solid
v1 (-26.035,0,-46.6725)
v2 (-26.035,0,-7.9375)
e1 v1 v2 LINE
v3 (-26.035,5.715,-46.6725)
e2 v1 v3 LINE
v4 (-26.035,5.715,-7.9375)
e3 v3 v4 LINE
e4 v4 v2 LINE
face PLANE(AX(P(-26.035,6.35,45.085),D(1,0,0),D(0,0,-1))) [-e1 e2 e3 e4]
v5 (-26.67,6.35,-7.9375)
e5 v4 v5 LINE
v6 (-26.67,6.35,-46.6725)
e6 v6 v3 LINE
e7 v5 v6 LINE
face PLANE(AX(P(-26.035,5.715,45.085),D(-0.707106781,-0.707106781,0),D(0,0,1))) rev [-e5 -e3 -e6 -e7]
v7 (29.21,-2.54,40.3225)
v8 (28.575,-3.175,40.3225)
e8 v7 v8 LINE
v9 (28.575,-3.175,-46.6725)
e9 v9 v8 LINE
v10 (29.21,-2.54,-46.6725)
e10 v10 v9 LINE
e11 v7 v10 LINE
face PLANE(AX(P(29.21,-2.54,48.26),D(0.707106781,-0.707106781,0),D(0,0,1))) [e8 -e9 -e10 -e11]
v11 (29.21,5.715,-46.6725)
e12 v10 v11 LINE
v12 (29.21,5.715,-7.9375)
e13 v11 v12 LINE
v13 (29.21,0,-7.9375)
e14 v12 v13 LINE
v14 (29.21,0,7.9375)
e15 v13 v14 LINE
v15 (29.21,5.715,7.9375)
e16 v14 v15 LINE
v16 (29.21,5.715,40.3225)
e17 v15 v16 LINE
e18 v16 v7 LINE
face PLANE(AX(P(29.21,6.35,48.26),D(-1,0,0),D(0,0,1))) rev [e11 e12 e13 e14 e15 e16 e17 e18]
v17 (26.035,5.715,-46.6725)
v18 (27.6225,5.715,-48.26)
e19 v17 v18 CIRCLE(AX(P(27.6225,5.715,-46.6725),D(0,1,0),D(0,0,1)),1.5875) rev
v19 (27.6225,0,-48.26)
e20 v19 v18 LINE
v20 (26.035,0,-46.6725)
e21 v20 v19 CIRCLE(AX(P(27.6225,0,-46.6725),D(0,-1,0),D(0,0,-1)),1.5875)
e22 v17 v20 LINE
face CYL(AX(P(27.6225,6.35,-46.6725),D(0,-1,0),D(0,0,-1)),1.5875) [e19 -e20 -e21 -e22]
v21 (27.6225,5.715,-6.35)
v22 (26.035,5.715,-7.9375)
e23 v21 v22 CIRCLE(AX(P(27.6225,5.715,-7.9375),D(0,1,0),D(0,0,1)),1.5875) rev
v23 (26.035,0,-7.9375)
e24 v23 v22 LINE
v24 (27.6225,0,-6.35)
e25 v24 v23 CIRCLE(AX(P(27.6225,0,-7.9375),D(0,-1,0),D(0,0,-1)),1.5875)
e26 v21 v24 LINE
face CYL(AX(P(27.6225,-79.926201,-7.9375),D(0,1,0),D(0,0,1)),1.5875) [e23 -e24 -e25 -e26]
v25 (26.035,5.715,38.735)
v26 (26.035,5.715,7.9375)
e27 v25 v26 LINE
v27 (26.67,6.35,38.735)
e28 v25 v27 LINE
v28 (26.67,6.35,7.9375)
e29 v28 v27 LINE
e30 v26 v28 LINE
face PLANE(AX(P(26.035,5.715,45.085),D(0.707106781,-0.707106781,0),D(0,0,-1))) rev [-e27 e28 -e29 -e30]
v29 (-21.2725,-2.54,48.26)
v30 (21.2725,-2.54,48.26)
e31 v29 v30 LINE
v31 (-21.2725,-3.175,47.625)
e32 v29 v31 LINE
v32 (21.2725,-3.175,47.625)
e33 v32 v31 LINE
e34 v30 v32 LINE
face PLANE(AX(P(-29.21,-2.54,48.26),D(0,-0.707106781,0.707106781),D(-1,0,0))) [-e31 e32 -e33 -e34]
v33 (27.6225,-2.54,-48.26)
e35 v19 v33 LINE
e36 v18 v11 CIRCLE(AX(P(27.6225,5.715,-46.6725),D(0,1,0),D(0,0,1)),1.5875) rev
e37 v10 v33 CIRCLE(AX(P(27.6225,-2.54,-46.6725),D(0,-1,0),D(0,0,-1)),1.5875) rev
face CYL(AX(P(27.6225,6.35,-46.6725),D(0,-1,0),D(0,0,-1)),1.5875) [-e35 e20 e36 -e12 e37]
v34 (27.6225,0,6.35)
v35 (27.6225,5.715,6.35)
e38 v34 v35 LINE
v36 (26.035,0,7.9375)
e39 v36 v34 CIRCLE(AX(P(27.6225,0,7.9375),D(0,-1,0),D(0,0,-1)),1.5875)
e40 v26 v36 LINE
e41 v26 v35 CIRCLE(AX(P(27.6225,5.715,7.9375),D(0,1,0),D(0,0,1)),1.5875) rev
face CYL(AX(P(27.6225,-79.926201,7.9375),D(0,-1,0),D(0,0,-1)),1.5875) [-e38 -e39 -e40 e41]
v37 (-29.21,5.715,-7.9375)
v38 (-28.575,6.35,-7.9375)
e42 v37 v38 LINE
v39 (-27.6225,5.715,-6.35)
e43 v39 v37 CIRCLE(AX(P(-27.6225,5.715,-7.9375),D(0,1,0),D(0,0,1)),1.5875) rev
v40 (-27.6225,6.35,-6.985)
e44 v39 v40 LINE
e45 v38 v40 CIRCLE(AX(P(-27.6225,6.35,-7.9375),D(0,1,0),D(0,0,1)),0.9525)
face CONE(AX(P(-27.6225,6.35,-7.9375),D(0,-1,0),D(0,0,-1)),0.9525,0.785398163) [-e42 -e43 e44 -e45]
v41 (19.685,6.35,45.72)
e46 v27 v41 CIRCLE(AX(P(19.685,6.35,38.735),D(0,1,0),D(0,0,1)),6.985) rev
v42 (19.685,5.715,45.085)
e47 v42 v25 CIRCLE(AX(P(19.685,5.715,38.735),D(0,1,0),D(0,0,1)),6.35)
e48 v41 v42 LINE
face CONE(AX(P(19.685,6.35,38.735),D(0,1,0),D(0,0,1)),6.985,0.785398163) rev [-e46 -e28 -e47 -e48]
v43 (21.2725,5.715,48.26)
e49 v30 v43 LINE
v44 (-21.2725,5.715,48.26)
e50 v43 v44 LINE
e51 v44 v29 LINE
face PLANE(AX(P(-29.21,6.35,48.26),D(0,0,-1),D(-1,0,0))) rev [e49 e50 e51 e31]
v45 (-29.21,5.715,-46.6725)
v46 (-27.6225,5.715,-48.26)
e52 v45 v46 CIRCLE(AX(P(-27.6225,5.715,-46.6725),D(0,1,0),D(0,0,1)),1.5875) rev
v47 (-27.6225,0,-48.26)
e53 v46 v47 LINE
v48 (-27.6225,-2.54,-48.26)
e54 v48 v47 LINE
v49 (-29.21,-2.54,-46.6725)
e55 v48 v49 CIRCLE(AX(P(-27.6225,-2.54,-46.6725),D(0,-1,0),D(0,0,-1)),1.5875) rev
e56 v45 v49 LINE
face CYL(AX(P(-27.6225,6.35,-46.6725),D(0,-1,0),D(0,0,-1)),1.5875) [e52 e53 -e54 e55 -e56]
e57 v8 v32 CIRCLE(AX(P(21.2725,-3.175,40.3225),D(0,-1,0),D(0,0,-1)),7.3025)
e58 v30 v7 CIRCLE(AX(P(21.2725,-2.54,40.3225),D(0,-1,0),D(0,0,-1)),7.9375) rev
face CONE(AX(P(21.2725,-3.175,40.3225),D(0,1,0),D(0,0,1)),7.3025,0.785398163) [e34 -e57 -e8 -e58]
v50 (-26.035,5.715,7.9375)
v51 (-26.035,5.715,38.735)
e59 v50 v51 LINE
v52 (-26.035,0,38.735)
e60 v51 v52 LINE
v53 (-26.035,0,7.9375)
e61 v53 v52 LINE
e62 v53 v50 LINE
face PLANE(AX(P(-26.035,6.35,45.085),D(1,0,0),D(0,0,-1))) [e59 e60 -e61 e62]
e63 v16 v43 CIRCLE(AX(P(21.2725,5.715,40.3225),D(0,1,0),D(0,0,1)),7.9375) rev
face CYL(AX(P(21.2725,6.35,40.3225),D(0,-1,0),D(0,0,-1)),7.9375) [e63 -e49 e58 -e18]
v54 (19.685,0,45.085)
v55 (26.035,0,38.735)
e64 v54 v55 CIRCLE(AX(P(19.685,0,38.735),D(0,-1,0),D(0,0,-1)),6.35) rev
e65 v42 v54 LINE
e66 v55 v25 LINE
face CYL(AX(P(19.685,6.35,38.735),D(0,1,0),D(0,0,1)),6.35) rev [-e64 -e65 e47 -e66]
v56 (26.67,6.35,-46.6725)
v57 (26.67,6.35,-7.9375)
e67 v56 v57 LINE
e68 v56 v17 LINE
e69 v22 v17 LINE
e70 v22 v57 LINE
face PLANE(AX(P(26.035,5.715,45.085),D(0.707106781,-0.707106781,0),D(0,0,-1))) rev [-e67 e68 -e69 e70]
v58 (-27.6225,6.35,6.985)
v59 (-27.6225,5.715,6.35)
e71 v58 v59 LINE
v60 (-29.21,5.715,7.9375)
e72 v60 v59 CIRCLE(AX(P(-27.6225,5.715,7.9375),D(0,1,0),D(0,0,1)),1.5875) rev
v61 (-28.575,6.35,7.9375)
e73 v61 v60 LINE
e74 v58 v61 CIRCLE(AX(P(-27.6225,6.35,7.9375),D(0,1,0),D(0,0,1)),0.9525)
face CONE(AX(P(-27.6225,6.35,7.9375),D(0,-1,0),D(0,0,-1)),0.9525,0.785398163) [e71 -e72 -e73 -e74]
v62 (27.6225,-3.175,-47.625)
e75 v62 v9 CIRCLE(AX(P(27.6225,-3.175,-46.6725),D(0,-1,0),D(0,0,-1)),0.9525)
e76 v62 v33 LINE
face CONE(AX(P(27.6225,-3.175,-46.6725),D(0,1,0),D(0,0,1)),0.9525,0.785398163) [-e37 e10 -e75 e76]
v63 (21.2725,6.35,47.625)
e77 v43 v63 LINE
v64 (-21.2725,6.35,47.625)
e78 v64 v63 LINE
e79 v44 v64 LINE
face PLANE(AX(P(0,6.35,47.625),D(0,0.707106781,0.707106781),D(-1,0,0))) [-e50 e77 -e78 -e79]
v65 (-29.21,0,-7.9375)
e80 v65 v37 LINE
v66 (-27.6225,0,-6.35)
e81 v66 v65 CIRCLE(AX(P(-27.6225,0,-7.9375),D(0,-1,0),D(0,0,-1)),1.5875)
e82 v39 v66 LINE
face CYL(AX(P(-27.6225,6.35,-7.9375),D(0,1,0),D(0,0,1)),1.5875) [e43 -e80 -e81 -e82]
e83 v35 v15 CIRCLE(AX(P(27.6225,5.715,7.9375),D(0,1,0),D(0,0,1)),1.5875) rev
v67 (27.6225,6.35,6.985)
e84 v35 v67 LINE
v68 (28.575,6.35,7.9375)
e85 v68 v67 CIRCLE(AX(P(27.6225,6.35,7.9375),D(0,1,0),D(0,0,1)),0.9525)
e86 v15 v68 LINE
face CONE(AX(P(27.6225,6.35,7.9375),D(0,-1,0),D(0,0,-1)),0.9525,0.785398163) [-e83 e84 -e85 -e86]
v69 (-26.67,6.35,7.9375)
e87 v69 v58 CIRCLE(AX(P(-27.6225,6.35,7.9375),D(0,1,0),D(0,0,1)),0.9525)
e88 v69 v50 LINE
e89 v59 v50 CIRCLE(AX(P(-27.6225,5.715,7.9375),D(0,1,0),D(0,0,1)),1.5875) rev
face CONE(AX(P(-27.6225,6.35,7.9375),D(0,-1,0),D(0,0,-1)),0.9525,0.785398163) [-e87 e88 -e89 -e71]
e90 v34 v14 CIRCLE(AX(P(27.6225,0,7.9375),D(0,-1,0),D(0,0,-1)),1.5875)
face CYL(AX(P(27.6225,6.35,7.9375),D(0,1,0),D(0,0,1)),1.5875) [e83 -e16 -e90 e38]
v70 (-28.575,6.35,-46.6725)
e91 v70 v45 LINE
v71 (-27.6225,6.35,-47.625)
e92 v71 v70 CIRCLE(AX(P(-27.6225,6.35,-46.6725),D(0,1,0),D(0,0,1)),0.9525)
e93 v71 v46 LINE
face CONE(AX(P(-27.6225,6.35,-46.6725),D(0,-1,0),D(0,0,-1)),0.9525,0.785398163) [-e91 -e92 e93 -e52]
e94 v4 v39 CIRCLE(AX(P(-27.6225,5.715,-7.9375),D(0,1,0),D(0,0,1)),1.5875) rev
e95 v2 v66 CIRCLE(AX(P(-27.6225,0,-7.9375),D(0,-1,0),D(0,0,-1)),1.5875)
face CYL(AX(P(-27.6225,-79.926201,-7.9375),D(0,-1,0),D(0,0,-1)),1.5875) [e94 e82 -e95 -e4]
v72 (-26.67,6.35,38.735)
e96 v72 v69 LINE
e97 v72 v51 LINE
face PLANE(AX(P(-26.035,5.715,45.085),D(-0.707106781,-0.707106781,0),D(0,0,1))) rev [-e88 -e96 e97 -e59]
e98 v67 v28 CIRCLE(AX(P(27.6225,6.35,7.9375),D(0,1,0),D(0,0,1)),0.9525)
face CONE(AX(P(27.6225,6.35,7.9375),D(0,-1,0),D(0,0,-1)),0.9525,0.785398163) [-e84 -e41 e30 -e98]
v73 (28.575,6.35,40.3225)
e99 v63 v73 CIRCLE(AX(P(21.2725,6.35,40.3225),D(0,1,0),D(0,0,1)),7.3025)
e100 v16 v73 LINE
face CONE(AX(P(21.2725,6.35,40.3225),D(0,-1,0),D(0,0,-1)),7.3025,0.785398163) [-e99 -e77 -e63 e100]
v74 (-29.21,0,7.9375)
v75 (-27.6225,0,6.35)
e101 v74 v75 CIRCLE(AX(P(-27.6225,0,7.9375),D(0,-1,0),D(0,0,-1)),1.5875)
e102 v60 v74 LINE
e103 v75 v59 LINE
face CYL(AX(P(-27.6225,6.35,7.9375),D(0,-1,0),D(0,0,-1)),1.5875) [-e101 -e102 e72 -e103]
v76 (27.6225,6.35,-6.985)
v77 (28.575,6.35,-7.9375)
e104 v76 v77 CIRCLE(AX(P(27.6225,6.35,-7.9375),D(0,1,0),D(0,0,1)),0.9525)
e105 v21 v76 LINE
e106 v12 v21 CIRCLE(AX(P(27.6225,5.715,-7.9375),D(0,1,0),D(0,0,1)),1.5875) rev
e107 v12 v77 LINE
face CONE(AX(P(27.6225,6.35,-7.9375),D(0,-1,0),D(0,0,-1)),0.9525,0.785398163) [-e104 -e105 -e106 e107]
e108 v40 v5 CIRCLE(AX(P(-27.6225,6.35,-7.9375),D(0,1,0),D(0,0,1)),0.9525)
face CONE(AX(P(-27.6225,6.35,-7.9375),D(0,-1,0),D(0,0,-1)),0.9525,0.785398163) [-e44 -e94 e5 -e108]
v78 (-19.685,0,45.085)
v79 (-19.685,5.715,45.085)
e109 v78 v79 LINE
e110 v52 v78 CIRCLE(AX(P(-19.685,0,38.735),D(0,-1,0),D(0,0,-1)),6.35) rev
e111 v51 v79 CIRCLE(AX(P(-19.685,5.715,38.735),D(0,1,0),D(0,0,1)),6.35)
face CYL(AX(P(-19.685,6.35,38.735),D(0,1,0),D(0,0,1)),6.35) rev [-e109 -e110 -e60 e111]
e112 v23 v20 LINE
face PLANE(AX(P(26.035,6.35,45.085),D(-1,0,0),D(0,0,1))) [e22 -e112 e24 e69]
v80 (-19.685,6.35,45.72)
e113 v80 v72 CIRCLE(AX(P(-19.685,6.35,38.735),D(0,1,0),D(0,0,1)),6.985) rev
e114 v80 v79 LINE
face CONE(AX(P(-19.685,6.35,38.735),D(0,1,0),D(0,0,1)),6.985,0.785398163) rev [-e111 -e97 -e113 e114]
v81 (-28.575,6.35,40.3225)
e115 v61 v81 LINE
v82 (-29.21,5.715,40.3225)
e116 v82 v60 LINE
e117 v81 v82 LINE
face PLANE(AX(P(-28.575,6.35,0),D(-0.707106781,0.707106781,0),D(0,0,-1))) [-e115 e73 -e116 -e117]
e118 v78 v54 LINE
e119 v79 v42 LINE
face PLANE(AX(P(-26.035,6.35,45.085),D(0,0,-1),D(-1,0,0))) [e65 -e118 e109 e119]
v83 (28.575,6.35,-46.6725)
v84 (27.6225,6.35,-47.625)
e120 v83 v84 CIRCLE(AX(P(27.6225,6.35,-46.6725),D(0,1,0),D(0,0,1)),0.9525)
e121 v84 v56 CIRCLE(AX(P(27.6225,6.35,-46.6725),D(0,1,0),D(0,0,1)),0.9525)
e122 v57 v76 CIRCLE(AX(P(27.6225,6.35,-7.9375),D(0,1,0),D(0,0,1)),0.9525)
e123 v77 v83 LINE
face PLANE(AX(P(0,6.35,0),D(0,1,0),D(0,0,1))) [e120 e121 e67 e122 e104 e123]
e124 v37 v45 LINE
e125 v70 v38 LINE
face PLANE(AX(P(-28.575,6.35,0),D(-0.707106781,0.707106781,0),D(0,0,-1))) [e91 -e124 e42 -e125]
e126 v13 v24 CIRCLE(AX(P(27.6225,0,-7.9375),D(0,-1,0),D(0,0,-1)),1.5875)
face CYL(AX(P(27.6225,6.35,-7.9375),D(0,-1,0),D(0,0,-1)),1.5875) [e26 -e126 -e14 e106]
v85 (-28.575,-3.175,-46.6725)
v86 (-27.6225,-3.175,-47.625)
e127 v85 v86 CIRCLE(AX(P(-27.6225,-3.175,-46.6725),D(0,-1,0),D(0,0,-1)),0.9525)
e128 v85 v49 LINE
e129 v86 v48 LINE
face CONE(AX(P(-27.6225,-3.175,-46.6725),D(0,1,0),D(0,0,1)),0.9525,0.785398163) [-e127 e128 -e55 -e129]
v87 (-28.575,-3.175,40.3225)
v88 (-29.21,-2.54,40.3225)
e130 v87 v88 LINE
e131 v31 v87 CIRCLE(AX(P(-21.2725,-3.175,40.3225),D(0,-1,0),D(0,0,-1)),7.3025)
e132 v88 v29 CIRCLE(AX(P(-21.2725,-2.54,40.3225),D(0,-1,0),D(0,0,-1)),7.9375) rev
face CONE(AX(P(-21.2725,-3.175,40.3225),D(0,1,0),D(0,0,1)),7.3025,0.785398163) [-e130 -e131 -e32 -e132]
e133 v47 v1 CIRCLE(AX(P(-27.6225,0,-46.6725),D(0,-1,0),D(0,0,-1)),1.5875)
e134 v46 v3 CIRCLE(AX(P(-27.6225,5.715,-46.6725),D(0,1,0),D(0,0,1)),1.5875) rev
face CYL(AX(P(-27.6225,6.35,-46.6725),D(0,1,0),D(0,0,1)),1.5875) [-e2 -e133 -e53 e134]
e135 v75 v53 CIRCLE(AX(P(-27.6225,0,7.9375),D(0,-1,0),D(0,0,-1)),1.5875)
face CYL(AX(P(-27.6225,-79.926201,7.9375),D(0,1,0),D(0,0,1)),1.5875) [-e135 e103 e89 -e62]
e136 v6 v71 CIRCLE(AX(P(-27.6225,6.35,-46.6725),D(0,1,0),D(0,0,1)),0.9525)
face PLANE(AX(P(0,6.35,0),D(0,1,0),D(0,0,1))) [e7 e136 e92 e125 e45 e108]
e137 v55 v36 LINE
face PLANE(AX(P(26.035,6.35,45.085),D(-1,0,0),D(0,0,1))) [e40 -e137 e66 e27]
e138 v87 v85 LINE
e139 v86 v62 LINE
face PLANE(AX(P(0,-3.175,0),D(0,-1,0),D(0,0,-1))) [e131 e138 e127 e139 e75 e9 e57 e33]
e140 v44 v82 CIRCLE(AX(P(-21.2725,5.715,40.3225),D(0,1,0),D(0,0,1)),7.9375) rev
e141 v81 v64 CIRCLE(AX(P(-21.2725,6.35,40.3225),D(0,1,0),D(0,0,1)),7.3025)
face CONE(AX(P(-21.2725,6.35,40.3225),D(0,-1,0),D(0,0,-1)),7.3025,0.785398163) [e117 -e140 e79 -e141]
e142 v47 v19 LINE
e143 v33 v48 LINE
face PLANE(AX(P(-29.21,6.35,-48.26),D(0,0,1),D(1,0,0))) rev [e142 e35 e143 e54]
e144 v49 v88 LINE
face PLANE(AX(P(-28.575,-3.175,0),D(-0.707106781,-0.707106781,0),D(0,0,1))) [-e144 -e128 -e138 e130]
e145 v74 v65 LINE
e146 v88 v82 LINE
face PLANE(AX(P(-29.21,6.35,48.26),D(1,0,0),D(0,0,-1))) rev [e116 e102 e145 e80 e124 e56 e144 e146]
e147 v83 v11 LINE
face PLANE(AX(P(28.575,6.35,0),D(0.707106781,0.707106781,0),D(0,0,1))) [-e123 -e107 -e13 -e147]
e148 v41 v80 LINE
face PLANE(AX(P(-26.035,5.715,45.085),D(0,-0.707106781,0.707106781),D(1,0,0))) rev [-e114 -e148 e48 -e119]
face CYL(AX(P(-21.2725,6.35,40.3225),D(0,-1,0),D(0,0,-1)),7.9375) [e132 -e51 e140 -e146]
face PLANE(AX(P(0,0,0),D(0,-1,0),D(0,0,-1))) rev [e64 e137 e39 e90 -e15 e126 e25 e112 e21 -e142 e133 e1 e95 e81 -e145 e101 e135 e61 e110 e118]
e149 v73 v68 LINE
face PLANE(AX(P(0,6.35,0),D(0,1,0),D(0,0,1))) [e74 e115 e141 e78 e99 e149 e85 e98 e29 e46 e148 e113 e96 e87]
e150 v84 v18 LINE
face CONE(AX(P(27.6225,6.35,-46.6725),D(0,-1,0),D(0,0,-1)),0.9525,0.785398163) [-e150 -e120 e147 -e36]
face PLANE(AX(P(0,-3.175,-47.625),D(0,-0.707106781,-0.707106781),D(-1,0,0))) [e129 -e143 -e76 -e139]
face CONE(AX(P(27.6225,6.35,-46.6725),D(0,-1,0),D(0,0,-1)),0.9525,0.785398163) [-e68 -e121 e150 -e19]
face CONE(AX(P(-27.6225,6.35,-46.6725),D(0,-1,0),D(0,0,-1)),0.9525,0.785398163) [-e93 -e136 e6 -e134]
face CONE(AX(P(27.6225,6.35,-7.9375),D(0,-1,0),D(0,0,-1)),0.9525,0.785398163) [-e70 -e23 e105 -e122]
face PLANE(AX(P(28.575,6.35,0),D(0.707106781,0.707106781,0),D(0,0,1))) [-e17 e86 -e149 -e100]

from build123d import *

# Parameters (mm, degrees)
SKETCH1_W           = 58.42
SKETCH1_H           = 96.52
SKETCH1_W_2         = 52.07
SKETCH1_H_2         = 90.17
BOSS_EXTRUDE1_DEPTH = 6.35
SKETCH1_4_W         = 58.42
SKETCH1_4_H         = 96.52
BOSS_EXTRUDE2_DEPTH = 3.175
FILLET1_R           = 6.35
SKETCH4_W           = 52.07
SKETCH4_H           = 20.225419923
CUT_EXTRUDE2_DEPTH  = 6.35
SKETCH5_W           = 78.910757724
SKETCH5_H           = 12.7
CUT_EXTRUDE3_DEPTH  = 6.35
FILLET2_R           = 1.5875
FILLET3_R           = 7.9375
CHAMFER2_SIZE       = 0.635


with BuildPart() as part:
    # Sketch1 → Boss-Extrude1 (new body)
    with BuildSketch(Plane(origin=(0, 0, 0), x_dir=(1, 0, 0), z_dir=(0, 1, 0))):
        Rectangle(SKETCH1_W, SKETCH1_H)
        Rectangle(SKETCH1_W_2, SKETCH1_H_2, mode=Mode.SUBTRACT)
    extrude(amount=BOSS_EXTRUDE1_DEPTH)

    # Sketch1<4> → Boss-Extrude2 (add)
    with BuildSketch(Plane(origin=(0, 0, 0), x_dir=(1, 0, 0), z_dir=(0, 1, 0))):
        Rectangle(SKETCH1_4_W, SKETCH1_4_H)
    extrude(amount=-BOSS_EXTRUDE2_DEPTH)

    # Fillet1
    fillet1_edges = [part.edges().sort_by_distance(p)[0] for p in [
        (26.035, 3.175, 45.085),
        (26.035, 3.175, -45.085),
        (-26.035, 3.175, -45.085),
        (-26.035, 3.175, 45.085),
    ]]
    fillet(fillet1_edges, radius=FILLET1_R)

    # Sketch4 → Cut-Extrude2 (cut)
    with BuildSketch(Plane(origin=(0, 6.35, 0), x_dir=(1, 0, 0), z_dir=(0, 1, 0))):
        with Locations((0, 43.394544924)):
            Rectangle(SKETCH4_W, SKETCH4_H)
    extrude(amount=-CUT_EXTRUDE2_DEPTH, mode=Mode.SUBTRACT)

    # Sketch5 → Cut-Extrude3 (cut)
    with BuildSketch(Plane(origin=(0, 6.35, 0), x_dir=(1, 0, 0), z_dir=(0, 1, 0))):
        Rectangle(SKETCH5_W, SKETCH5_H)
    extrude(amount=-CUT_EXTRUDE3_DEPTH, mode=Mode.SUBTRACT)

    # Fillet2
    fillet2_edges = [part.edges().sort_by_distance(p)[0] for p in [
        (29.21, 3.175, -6.35),
        (-29.21, 3.175, -6.35),
        (26.035, 3.175, -6.35),
        (-26.035, 3.175, -6.35),
        (29.21, 3.175, 6.35),
        (-29.21, 3.175, 6.35),
        (26.035, 3.175, 6.35),
        (-26.035, 3.175, 6.35),
        (-29.21, 1.5875, -48.26),
        (29.21, 1.5875, -48.26),
        (26.035, 3.175, -48.26),
        (-26.035, 3.175, -48.26),
    ]]
    fillet(fillet2_edges, radius=FILLET2_R - 0.0001)  # a hair under: the kernel refuses the full size

    # Fillet3
    fillet3_edges = [part.edges().sort_by_distance(p)[0] for p in [
        (-29.21, 1.5875, 48.26),
        (29.21, 1.5875, 48.26),
    ]]
    fillet(fillet3_edges, radius=FILLET3_R)

    # Chamfer2
    chamfer2_edges = [part.edges().sort_by_distance(p)[0] for p in [
        (29.21, 6.35, -27.305),
        (-29.21, 6.35, 24.12995),
        (-26.035, 6.35, 23.3362),
        (-28.745061304, 6.35, 6.814938696),
        (-26.499938696, 6.35, 6.814938696),
        (26.499938696, 6.35, 6.814938696),
        (28.745061304, 6.35, 6.814938696),
        (26.035, 6.35, -27.305),
        (26.499938696, 6.35, -47.795061304),
        (28.745061304, 6.35, -47.795061304),
        (26.499938696, 6.35, -6.814938696),
        (28.745061304, 6.35, -6.814938696),
        (-29.21, 6.35, -27.305),
        (-26.035, 6.35, -27.305),
        (-26.499938696, 6.35, -47.795061304),
        (-28.745061304, 6.35, -47.795061304),
        (-28.745061304, 6.35, -6.814938696),
        (-26.499938696, 6.35, -6.814938696),
        (0, -3.175, -48.26),
        (-28.745061304, -3.175, -47.795061304),
        (28.745061304, -3.175, -47.795061304),
        (29.21, 6.35, 24.12995),
        (29.21, -3.175, -3.17505),
        (0, -3.175, 48.26),
        (-29.21, -3.175, -3.17505),
        (-26.885160076, -3.175, 45.935160076),
        (26.885160076, -3.175, 45.935160076),
        (0, 6.35, 48.26),
        (-26.885160076, 6.35, 45.935160076),
        (26.885160076, 6.35, 45.935160076),
        (26.035, 6.35, 23.3362),
        (0, 6.35, 45.085),
        (24.175128061, 6.35, 43.225128061),
        (-24.175128061, 6.35, 43.225128061),
    ]]
    chamfer(chamfer2_edges, length=CHAMFER2_SIZE)


solid = part.part
